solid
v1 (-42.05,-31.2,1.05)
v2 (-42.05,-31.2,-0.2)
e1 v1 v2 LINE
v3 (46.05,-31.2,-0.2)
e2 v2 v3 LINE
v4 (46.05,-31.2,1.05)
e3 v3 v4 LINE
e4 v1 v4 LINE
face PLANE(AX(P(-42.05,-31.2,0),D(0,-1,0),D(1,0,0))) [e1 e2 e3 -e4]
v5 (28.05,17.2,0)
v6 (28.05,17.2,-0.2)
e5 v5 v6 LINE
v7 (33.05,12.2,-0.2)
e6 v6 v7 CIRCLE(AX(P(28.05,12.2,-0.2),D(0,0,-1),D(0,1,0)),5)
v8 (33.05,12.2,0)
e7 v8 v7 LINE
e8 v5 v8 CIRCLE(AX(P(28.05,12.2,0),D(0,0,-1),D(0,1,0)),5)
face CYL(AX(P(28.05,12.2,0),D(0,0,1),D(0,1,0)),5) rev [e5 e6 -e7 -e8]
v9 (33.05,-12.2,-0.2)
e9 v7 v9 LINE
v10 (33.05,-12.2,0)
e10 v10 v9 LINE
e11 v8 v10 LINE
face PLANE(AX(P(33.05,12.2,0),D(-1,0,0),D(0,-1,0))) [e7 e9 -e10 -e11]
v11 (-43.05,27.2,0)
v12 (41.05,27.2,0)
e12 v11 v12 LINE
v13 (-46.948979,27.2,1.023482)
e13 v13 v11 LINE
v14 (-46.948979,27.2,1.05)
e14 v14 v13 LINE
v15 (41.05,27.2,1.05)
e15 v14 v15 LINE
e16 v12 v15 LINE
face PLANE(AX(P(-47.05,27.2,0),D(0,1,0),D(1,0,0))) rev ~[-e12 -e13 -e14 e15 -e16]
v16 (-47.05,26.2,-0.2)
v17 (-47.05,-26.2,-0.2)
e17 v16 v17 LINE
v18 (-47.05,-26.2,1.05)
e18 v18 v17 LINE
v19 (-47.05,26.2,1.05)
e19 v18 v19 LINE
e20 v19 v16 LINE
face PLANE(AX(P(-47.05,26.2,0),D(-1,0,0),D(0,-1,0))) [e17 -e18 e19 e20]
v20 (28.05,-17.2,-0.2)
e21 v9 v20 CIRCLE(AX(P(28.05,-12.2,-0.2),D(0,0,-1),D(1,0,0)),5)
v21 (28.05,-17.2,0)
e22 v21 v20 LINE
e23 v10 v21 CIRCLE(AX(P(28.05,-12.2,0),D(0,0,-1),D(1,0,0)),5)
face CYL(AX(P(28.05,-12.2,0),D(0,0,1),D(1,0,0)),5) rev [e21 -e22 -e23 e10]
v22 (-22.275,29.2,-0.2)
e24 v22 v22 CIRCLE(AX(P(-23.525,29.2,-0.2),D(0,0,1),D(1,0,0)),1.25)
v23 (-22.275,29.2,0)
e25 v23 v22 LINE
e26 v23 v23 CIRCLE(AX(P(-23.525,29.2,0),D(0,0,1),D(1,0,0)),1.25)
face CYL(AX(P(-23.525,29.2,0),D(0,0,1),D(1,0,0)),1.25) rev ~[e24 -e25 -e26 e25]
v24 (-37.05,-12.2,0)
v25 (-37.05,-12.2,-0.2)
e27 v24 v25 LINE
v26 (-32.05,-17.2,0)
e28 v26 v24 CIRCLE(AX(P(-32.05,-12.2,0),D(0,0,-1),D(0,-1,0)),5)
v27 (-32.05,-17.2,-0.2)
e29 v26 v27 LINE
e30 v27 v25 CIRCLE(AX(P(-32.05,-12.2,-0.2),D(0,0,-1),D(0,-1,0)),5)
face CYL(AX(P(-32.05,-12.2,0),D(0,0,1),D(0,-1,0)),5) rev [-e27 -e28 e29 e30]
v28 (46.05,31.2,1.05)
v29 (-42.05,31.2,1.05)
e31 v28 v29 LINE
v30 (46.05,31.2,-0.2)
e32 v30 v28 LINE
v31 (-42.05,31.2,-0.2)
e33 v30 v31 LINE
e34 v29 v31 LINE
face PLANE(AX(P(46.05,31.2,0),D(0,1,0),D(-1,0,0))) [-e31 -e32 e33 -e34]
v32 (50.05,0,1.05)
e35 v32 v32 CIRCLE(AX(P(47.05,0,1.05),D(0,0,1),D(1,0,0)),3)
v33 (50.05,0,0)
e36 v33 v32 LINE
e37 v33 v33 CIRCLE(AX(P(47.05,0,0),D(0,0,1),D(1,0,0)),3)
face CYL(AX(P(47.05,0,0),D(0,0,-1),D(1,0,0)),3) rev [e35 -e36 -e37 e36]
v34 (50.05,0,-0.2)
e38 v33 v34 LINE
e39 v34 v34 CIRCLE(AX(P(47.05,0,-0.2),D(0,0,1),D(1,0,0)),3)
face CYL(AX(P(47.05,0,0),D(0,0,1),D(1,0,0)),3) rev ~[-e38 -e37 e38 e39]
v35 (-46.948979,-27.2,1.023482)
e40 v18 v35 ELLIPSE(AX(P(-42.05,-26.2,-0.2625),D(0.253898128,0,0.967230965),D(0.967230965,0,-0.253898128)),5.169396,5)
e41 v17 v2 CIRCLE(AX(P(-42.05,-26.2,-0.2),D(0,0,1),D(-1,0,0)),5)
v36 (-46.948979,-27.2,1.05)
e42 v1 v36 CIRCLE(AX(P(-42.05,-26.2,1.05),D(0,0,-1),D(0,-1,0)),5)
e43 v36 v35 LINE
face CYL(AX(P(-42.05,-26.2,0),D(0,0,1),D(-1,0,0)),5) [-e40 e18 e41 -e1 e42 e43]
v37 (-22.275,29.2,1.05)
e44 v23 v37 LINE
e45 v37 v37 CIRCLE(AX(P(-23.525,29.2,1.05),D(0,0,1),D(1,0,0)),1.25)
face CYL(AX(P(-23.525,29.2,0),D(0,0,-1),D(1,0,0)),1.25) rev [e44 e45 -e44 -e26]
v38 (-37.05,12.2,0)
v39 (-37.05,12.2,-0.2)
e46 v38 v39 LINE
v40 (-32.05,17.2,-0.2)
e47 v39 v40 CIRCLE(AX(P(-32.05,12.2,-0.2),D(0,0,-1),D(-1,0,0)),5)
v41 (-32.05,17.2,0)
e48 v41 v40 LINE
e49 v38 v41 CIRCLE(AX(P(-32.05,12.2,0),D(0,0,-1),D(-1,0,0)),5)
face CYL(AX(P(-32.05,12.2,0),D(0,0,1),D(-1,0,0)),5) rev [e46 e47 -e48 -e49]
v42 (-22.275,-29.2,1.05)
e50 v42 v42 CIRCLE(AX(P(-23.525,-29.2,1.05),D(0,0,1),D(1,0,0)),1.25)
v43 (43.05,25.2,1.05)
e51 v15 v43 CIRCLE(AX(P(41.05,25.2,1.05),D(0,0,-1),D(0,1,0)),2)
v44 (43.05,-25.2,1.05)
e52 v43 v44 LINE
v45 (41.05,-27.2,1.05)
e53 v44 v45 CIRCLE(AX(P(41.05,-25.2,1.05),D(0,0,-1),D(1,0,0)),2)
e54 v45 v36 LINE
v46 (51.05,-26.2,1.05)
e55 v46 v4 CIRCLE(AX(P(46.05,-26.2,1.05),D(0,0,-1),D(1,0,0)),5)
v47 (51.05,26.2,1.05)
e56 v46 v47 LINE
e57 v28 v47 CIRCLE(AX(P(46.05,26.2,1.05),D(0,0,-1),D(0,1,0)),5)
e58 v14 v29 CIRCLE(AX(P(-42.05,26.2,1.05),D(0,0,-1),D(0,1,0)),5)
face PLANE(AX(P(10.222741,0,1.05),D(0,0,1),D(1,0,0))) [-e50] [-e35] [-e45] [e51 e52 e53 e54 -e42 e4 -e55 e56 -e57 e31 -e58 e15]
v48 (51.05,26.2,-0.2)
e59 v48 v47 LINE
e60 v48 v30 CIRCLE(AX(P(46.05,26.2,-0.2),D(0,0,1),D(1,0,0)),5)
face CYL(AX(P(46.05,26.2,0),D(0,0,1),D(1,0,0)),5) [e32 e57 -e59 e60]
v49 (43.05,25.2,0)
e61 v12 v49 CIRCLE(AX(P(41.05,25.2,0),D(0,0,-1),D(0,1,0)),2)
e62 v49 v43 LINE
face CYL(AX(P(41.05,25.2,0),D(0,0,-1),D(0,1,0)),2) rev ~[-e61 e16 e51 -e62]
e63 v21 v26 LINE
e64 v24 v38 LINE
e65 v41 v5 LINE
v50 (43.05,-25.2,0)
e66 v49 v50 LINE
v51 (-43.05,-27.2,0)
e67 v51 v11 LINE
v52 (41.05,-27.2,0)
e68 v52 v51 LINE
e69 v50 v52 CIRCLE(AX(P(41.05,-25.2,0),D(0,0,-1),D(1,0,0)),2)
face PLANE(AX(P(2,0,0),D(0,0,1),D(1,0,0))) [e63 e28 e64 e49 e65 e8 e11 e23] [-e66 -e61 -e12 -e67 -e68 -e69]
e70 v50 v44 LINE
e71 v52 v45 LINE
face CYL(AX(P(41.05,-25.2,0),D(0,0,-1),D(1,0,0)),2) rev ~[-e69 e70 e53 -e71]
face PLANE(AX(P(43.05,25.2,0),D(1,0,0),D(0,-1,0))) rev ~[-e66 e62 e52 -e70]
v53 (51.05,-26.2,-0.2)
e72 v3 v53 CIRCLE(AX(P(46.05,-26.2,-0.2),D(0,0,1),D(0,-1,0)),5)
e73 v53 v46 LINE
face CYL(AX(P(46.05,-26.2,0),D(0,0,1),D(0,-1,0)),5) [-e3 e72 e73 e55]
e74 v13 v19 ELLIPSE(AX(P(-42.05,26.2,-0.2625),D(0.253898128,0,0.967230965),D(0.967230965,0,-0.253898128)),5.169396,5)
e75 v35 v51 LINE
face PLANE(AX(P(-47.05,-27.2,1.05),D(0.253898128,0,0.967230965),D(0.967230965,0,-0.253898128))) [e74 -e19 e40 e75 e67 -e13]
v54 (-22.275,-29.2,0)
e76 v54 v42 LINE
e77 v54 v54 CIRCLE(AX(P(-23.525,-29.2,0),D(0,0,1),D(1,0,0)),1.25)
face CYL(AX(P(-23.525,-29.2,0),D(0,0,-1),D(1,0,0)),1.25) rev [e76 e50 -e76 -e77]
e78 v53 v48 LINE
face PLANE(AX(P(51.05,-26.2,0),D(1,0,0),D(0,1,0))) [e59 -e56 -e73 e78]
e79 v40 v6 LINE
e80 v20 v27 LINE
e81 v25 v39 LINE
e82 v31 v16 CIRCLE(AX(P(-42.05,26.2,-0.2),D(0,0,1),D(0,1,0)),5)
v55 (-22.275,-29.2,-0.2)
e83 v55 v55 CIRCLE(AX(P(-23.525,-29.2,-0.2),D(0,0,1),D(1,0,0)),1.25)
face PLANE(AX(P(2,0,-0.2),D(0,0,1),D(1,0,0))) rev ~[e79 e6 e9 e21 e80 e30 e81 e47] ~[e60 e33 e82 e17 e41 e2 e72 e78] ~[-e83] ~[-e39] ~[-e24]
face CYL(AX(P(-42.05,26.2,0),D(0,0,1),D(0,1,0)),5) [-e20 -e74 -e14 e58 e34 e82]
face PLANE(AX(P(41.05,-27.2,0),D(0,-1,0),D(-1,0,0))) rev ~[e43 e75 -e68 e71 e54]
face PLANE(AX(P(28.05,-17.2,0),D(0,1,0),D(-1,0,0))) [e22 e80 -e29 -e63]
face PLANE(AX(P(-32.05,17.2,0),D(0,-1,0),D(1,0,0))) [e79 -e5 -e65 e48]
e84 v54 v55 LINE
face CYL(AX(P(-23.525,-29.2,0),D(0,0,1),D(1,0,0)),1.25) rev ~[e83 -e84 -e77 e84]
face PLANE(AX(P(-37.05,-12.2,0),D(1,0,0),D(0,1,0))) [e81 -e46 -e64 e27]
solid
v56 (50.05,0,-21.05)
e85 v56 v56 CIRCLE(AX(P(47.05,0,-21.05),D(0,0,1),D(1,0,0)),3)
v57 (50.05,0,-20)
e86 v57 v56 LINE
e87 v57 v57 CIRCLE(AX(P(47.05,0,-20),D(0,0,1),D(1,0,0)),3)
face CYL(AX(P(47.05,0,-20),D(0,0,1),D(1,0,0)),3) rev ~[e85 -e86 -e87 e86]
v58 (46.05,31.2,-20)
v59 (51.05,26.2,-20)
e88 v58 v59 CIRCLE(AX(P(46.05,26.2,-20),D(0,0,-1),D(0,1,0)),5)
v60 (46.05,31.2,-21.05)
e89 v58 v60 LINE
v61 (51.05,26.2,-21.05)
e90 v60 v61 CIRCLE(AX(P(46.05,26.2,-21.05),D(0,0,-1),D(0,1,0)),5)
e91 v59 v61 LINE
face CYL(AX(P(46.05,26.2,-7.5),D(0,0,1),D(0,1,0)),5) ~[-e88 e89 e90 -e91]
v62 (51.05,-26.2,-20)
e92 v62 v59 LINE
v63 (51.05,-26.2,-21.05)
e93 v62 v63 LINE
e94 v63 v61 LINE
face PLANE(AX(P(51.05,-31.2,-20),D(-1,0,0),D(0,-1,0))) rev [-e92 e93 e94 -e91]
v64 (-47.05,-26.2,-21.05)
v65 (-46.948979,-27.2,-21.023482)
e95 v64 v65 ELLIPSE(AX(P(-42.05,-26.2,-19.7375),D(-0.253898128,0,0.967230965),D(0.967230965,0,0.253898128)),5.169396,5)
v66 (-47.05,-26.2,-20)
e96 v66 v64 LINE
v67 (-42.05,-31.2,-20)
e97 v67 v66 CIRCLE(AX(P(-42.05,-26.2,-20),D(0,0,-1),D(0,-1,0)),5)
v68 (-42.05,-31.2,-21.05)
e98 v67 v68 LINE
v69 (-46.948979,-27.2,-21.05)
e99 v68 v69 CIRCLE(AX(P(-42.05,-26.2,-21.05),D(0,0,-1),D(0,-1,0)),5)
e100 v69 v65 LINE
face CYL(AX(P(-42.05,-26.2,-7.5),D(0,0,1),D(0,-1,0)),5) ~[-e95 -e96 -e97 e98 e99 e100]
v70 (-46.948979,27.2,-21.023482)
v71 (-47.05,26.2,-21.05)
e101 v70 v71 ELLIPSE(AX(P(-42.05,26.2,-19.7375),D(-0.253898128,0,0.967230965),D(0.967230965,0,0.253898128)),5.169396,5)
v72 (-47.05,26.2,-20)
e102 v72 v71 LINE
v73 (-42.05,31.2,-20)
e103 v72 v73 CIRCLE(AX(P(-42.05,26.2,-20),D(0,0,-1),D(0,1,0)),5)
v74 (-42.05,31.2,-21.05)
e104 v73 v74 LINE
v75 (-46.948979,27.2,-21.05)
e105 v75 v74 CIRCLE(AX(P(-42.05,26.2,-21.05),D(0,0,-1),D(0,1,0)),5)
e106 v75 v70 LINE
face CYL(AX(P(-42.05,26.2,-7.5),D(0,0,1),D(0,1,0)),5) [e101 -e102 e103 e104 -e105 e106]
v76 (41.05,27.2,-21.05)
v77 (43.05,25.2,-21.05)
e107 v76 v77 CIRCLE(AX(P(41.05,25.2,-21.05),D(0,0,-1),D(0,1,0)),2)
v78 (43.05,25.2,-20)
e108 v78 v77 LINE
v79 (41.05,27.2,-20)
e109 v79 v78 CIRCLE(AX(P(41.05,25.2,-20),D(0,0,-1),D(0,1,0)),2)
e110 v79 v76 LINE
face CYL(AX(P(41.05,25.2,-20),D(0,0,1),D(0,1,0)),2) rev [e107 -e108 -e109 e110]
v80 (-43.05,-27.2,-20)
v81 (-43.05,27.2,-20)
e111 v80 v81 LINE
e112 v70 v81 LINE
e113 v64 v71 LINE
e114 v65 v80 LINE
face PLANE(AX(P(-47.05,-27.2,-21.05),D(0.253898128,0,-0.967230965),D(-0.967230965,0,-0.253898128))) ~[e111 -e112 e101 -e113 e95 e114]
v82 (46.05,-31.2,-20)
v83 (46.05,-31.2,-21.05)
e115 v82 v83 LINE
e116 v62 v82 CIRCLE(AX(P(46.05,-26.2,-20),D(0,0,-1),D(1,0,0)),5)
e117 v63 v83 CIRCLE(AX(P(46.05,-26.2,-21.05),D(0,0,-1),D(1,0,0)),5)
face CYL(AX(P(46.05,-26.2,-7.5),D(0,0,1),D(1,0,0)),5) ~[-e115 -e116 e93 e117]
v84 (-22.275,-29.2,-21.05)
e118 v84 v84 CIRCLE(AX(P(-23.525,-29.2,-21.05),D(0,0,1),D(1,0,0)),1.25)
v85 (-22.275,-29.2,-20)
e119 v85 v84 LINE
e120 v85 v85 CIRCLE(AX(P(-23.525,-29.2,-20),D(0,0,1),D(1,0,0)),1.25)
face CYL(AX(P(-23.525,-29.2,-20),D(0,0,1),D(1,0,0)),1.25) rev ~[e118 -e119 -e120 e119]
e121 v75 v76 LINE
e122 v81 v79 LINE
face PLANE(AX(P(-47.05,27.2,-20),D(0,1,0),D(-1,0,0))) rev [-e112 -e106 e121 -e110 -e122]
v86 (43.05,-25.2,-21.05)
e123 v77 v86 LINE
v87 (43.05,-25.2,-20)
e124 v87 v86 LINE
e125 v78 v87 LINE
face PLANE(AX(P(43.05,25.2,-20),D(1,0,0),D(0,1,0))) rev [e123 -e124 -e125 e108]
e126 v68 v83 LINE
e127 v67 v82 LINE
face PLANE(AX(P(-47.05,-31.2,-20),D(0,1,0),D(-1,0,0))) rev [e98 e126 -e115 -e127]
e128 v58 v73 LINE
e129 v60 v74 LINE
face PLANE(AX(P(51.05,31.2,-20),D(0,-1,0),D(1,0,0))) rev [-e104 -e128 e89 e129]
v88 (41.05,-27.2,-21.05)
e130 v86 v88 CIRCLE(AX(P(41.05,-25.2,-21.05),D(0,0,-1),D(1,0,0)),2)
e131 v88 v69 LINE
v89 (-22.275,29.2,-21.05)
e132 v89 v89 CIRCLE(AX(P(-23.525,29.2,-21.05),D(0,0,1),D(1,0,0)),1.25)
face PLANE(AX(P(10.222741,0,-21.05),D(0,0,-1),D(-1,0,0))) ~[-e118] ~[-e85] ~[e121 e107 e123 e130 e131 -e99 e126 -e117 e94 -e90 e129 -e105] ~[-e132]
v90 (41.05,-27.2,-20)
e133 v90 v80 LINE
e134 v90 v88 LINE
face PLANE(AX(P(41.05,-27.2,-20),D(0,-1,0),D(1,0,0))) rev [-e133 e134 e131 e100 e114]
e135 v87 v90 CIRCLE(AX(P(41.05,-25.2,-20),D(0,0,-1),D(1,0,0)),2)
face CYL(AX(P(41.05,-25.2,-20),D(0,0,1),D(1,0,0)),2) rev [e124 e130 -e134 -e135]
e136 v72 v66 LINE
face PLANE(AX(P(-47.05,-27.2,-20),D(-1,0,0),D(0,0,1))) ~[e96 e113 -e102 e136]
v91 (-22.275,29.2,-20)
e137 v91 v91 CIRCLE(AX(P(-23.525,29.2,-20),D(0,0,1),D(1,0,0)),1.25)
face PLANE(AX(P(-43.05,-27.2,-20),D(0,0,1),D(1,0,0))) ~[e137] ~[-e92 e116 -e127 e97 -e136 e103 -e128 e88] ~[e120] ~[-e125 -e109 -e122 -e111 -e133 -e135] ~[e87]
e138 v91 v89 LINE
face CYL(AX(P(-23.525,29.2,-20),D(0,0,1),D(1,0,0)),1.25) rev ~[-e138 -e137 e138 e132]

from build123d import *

# Parameters (mm, degrees)
F1_R        = 1.25
F1_R_2      = 3
F2_DEPTH    = 1.05
F5_T1_DEPTH = 26.05
F8_R        = 1.25
F8_R_2      = 3
F9_DEPTH    = 0.2


# Not quite as in the source:
# - a fillet or chamfer that OpenCascade refuses, or shapes differently, is made with other operations: its cross-section is extruded or revolved along the edge and cut away or added


with BuildPart() as f2:
    # F1 (on Top) → F2 (new body)
    with BuildSketch(Plane.XY):
        with BuildLine():
            Line((-47.05, 27.2), (-43.05, 27.2))
            Line((-43.05, 27.2), (41.05, 27.2))
            ThreePointArc((41.05, 27.2), (42.4642135624, 26.6142135624), (43.05, 25.2))
            Line((43.05, 25.2), (43.05, -25.2))
            ThreePointArc((43.05, -25.2), (42.4642135624, -26.6142135624), (41.05, -27.2))
            Line((41.05, -27.2), (-43.05, -27.2))
            Line((-43.05, -27.2), (-47.05, -27.2))
            Line((-47.05, -27.2), (-47.05, -31.2))
            Line((-47.05, -31.2), (51.05, -31.2))
            Line((51.05, -31.2), (51.05, 31.2))
            Line((51.05, 31.2), (-47.05, 31.2))
            Line((-47.05, 31.2), (-47.05, 27.2))
        make_face()
        with Locations((-23.525, -29.2)):
            Circle(F1_R, mode=Mode.SUBTRACT)
        with Locations((-23.525, 29.2)):
            Circle(F1_R, mode=Mode.SUBTRACT)
        with Locations((47.05, 0)):
            Circle(F1_R_2, mode=Mode.SUBTRACT)
    extrude(amount=F2_DEPTH)

    # F4: sweep along a path in F1
    with BuildLine(Plane.XY) as f4_path:
        Line((-47.05, -27.2), (-47.05, 27.2))
    # F3 (on face) → F4 (sweep)
    with BuildSketch(Plane(origin=(0, -27.2, 0), x_dir=(-1, 0, 0), z_dir=(0, 1, 0))):
        Polygon((47.05, 1.05), (43.05, 0), (47.05, 0), align=None)
    sweep(path=f4_path.line)

    # F5: fillet of radius 5 on 4 edges, made by hand

    # F5_s2 → F5_t1 (cut)
    with BuildSketch(Plane.XY.offset(-12.5)):
        with BuildLine():
            ThreePointArc((-42.05, 31.2), (-45.5855339059, 29.7355339059), (-47.05, 26.2))
            Line((-47.05, 26.2), (-47.05, 31.2))
            Line((-47.05, 31.2), (-42.05, 31.2))
        make_face()
        with BuildLine():
            ThreePointArc((-42.05, -31.2), (-45.5855339059, -29.7355339059), (-47.05, -26.2))
            Line((-47.05, -26.2), (-47.05, -31.2))
            Line((-47.05, -31.2), (-42.05, -31.2))
        make_face()
        with BuildLine():
            ThreePointArc((46.05, 31.2), (49.5855339059, 29.7355339059), (51.05, 26.2))
            Line((51.05, 26.2), (51.05, 31.2))
            Line((51.05, 31.2), (46.05, 31.2))
        make_face()
        with BuildLine():
            ThreePointArc((51.05, -26.2), (49.5855339059, -29.7355339059), (46.05, -31.2))
            Line((46.05, -31.2), (51.05, -31.2))
            Line((51.05, -31.2), (51.05, -26.2))
        make_face()
    extrude(amount=F5_T1_DEPTH, mode=Mode.SUBTRACT)


with BuildPart() as f7_1:
    # F7: instance of F2
    add(f2.part.mirror(Plane.XY.offset(-10)))


with BuildPart() as f2_1:
    add(f2.part)

    # F8 (on face) → F9 (join)
    with BuildSketch(Plane.XY):
        with BuildLine():
            Line((-42.05, -31.2), (46.05, -31.2))
            ThreePointArc((46.05, -31.2), (49.5855339059, -29.7355339059), (51.05, -26.2))
            Line((51.05, -26.2), (51.05, 26.2))
            ThreePointArc((51.05, 26.2), (49.5855339059, 29.7355339059), (46.05, 31.2))
            Line((46.05, 31.2), (-42.05, 31.2))
            ThreePointArc((-42.05, 31.2), (-45.5855339059, 29.7355339059), (-47.05, 26.2))
            Line((-47.05, 26.2), (-47.05, -26.2))
            ThreePointArc((-47.05, -26.2), (-45.5855339059, -29.7355339059), (-42.05, -31.2))
        make_face()
        with Locations((-23.525, -29.2)):
            Circle(F8_R, mode=Mode.SUBTRACT)
        with BuildLine():
            ThreePointArc((33.05, -12.2), (31.5855339059, -15.7355339059), (28.05, -17.2))
            Line((28.05, -17.2), (-32.05, -17.2))
            ThreePointArc((-32.05, -17.2), (-35.5855339059, -15.7355339059), (-37.05, -12.2))
            Line((-37.05, -12.2), (-37.05, 12.2))
            ThreePointArc((-37.05, 12.2), (-35.5855339059, 15.7355339059), (-32.05, 17.2))
            Line((-32.05, 17.2), (28.05, 17.2))
            ThreePointArc((28.05, 17.2), (31.5855339059, 15.7355339059), (33.05, 12.2))
            Line((33.05, 12.2), (33.05, -12.2))
        make_face(mode=Mode.SUBTRACT)
        with Locations((-23.525, 29.2)):
            Circle(F8_R, mode=Mode.SUBTRACT)
        with Locations((47.05, 0)):
            Circle(F8_R_2, mode=Mode.SUBTRACT)
    extrude(amount=-F9_DEPTH)


solid = Compound([f7_1.part, f2_1.part])
